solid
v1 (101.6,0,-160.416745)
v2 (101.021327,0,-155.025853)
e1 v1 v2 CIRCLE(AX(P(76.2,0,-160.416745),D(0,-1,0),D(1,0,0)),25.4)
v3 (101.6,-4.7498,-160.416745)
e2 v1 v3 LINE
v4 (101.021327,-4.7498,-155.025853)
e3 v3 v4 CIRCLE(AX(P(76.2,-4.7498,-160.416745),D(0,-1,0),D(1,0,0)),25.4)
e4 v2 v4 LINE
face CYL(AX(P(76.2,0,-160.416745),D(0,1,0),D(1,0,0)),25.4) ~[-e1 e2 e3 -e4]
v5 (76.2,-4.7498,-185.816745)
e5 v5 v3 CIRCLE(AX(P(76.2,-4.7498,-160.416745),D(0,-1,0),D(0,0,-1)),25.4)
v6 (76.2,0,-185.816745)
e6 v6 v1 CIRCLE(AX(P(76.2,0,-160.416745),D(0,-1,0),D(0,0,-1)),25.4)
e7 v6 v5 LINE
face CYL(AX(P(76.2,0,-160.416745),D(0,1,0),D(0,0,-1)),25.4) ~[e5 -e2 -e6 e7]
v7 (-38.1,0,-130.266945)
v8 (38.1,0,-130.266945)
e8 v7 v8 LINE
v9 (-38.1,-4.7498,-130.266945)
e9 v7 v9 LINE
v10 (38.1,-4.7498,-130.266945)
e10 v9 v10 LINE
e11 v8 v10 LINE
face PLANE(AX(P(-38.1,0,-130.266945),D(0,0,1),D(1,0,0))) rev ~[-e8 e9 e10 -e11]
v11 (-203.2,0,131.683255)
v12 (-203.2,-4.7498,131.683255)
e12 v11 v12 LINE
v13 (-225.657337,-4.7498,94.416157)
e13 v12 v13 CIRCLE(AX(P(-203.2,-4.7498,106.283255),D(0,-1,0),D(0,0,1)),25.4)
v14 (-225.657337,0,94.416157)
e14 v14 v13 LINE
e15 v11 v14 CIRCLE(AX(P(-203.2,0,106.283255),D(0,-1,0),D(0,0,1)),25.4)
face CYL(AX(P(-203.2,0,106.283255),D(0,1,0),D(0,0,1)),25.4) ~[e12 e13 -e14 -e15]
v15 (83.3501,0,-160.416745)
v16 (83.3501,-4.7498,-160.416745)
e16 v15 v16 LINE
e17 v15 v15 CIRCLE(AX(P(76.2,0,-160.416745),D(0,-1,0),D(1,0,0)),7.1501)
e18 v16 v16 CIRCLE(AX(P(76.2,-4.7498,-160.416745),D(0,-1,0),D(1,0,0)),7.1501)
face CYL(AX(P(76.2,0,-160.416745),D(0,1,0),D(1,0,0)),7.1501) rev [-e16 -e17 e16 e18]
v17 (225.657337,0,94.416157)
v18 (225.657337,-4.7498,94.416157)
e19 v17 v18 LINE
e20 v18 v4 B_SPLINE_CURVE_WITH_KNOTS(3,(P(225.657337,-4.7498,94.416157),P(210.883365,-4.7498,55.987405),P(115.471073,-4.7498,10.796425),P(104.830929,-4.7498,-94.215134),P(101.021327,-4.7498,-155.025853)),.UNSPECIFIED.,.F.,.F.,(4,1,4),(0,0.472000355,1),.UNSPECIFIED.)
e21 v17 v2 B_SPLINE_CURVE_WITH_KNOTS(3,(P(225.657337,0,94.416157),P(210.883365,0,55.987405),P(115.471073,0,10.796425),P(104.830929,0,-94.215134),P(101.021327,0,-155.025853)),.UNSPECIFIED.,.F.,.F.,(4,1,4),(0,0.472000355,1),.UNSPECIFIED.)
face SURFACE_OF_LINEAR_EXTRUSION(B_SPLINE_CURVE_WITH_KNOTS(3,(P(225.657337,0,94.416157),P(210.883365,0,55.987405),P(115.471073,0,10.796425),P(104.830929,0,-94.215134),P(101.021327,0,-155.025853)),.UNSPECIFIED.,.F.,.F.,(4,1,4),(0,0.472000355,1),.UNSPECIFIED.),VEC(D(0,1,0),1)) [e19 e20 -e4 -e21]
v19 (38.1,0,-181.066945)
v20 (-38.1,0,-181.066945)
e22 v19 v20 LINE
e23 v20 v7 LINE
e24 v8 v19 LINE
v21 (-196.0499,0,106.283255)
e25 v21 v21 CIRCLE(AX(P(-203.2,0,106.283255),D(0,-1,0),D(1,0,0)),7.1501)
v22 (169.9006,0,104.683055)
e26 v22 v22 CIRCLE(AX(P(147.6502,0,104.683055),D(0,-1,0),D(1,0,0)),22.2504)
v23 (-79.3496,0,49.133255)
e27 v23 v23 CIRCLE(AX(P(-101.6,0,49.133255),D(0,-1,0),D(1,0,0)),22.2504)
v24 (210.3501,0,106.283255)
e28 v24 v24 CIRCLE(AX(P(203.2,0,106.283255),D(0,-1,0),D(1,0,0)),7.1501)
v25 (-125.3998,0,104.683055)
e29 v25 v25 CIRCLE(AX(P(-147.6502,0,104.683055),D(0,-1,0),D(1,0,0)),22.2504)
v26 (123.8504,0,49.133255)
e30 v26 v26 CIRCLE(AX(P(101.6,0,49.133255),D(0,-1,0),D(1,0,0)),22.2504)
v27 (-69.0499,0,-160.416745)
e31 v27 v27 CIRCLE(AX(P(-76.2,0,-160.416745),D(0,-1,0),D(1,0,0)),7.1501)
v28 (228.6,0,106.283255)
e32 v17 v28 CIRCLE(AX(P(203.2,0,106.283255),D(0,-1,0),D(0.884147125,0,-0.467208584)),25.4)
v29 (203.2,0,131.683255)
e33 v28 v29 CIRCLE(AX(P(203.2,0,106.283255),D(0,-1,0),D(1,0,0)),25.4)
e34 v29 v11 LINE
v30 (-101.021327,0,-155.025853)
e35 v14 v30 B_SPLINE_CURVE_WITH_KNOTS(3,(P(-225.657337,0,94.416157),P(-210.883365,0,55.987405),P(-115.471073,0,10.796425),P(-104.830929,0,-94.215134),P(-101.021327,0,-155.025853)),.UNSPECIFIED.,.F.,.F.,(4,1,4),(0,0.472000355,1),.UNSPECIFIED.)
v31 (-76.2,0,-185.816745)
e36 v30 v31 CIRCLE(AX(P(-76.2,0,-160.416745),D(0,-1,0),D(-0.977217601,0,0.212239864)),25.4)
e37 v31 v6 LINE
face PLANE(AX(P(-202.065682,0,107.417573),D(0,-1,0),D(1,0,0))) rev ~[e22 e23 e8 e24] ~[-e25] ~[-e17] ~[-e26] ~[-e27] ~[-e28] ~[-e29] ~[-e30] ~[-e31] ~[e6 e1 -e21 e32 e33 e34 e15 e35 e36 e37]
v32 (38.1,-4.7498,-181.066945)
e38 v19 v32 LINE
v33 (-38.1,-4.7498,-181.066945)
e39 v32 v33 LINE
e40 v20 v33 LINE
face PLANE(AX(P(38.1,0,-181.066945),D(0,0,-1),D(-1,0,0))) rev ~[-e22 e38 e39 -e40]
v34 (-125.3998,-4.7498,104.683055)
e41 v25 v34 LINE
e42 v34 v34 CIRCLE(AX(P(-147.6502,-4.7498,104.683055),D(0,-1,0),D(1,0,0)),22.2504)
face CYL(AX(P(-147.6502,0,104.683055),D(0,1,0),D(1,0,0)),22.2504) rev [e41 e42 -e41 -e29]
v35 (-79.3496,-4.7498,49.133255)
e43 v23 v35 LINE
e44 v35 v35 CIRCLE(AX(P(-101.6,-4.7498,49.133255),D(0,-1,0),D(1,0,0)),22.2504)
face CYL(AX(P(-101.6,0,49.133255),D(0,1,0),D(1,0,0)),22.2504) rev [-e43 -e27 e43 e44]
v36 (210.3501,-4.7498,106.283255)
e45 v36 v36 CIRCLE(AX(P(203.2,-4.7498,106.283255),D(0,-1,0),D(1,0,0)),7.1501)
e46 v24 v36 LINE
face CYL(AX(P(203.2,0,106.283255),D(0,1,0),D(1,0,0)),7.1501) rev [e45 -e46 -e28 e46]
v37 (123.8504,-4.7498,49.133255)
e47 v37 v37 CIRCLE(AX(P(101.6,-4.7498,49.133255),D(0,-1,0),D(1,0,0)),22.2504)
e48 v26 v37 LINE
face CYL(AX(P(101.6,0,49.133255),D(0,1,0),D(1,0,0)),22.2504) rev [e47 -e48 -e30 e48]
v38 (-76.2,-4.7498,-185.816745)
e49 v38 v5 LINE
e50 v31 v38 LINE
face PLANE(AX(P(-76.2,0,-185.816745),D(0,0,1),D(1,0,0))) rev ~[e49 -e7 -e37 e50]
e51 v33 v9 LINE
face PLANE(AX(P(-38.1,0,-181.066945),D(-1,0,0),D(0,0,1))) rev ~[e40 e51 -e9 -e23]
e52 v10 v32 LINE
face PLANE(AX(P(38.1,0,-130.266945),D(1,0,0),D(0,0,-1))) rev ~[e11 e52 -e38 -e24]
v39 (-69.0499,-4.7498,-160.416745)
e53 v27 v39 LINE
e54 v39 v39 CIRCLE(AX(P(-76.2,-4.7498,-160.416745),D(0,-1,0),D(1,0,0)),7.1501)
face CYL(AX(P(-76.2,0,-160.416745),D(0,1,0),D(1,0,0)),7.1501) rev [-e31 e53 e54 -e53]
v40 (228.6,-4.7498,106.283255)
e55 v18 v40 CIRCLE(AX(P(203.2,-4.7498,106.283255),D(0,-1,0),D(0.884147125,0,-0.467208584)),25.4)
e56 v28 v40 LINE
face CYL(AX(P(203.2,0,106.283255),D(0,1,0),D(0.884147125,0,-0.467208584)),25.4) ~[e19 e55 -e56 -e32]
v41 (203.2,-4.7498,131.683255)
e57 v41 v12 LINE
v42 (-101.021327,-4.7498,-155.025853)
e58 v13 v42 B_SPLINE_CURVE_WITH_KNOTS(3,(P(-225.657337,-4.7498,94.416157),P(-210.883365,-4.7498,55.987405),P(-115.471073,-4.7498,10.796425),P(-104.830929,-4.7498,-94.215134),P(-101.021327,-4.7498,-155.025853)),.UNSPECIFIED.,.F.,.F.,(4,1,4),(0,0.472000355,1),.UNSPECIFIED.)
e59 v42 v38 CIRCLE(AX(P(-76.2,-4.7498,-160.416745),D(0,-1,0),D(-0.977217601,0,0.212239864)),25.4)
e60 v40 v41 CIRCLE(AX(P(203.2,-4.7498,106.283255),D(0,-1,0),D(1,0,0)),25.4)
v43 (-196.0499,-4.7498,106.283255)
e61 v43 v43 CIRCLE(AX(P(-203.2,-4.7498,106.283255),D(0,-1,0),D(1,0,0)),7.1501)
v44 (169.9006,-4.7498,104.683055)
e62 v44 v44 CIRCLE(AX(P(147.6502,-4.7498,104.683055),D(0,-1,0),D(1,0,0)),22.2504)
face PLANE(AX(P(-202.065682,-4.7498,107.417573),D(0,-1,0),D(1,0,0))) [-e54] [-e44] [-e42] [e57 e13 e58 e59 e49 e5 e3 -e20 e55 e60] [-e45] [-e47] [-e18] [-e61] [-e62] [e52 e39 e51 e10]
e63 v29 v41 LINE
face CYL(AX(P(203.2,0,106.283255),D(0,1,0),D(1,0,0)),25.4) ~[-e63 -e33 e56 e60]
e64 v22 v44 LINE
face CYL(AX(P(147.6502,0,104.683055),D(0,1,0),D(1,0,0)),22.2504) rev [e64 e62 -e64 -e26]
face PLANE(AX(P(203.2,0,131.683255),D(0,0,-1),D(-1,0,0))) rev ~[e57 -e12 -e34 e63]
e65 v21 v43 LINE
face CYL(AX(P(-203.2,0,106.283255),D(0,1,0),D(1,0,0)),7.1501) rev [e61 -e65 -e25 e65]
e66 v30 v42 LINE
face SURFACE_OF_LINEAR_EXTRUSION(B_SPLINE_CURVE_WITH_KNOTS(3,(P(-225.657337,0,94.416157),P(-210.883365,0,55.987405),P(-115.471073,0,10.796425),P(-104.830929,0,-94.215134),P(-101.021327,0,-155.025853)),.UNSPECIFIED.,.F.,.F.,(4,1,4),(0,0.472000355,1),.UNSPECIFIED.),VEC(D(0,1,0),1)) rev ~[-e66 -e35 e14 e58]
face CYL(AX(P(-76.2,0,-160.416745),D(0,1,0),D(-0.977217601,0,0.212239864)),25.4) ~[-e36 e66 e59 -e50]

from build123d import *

# Parameters (mm, degrees)
F0_R     = 7.1501
F0_R_2   = 22.2504
F1_DEPTH = 4.7498


with BuildPart() as f1:
    # F0 (on Front) → F1 (new body)
    with BuildSketch(Plane.XZ):
        with BuildLine():
            ThreePointArc((-225.6573369788, 94.4161567678), (-197.0867504248, 81.6298943923), (-177.8, 106.2832548048))
            ThreePointArc((-177.8, 106.2832548048), (-185.2394877579, 124.2437670469), (-203.2, 131.6832548048))
            ThreePointArc((-203.2, 131.6832548048), (-224.9552785565, 119.3930929018), (-225.6573369788, 94.4161567678))
        make_face()
        with Locations((-203.2, 106.2832548048)):
            Circle(F0_R, mode=Mode.SUBTRACT)
        with BuildLine():
            ThreePointArc((-203.2, 131.6832548048), (-185.2394877579, 124.2437670469), (-177.8, 106.2832548048))
            ThreePointArc((-177.8, 106.2832548048), (-197.0867504248, 81.6298943923), (-225.6573369788, 94.4161567678))
            add(Edge.make_bspline(
                [(-225.6573369788, 94.4161567678), (-210.8833649868, 55.9874046479), (-115.4710726931, 10.7964254469), (-104.8309285082, -94.2151341667), (-101.0213270695, -155.0258526432)],
                knots=[0, 0, 0, 0, 0.4720003547, 1, 1, 1, 1], degree=3))
            ThreePointArc((-101.0213270695, -155.0258526432), (-73.4890691235, -135.1618277773), (-50.8, -160.4167451952))
            ThreePointArc((-50.8, -160.4167451952), (-58.2394877579, -178.3772574373), (-76.2, -185.8167451952))
            Line((-76.2, -185.8167451952), (76.2, -185.8167451952))
            ThreePointArc((76.2, -185.8167451952), (56.4251590294, -144.4757394368), (101.0213270695, -155.0258526432))
            add(Edge.make_bspline(
                [(225.6573369788, 94.4161567678), (210.8833649868, 55.9874046479), (115.4710726931, 10.7964254469), (104.8309285082, -94.2151341667), (101.0213270695, -155.0258526432)],
                knots=[0, 0, 0, 0, 0.4720003547, 1, 1, 1, 1], degree=3))
            ThreePointArc((225.6573369788, 94.4161567678), (181.4447214435, 93.1734167078), (203.2, 131.6832548048))
            Line((203.2, 131.6832548048), (-203.2, 131.6832548048))
        make_face()
        Polygon((-38.1, -130.2669451952), (0, -130.2669451952), (38.1, -130.2669451952), (38.1, -181.0669451952), (0, -181.0669451952), (-38.1, -181.0669451952), align=None, mode=Mode.SUBTRACT)
        with Locations((-101.6, 49.1332548048)):
            Circle(F0_R_2, mode=Mode.SUBTRACT)
        with Locations((-147.6502, 104.6830548048)):
            Circle(F0_R_2, mode=Mode.SUBTRACT)
        with Locations((101.6, 49.1332548048)):
            Circle(F0_R_2, mode=Mode.SUBTRACT)
        with Locations((147.6502, 104.6830548048)):
            Circle(F0_R_2, mode=Mode.SUBTRACT)
        with BuildLine():
            ThreePointArc((228.6, 106.2832548048), (221.1605122421, 124.2437670469), (203.2, 131.6832548048))
            ThreePointArc((203.2, 131.6832548048), (181.4447214435, 93.1734167078), (225.6573369788, 94.4161567678))
            ThreePointArc((225.6573369788, 94.4161567678), (227.8533604125, 100.1700052296), (228.6, 106.2832548048))
        make_face()
        with Locations((203.2, 106.2832548048)):
            Circle(F0_R, mode=Mode.SUBTRACT)
        with BuildLine():
            ThreePointArc((-50.8, -160.4167451952), (-73.4890691235, -135.1618277773), (-101.0213270695, -155.0258526432))
            ThreePointArc((-101.0213270695, -155.0258526432), (-95.9748409706, -176.3577509536), (-76.2, -185.8167451952))
            ThreePointArc((-76.2, -185.8167451952), (-58.2394877579, -178.3772574373), (-50.8, -160.4167451952))
        make_face()
        with Locations((-76.2, -160.4167451952)):
            Circle(F0_R, mode=Mode.SUBTRACT)
        with BuildLine():
            ThreePointArc((101.6, -160.4167451952), (101.4549174179, -157.7058143187), (101.0213270695, -155.0258526432))
            ThreePointArc((101.0213270695, -155.0258526432), (56.4251590294, -144.4757394368), (76.2, -185.8167451952))
            ThreePointArc((76.2, -185.8167451952), (94.1605122421, -178.3772574373), (101.6, -160.4167451952))
        make_face()
        with Locations((76.2, -160.4167451952)):
            Circle(F0_R, mode=Mode.SUBTRACT)
    extrude(amount=F1_DEPTH)


solid = f1.part
